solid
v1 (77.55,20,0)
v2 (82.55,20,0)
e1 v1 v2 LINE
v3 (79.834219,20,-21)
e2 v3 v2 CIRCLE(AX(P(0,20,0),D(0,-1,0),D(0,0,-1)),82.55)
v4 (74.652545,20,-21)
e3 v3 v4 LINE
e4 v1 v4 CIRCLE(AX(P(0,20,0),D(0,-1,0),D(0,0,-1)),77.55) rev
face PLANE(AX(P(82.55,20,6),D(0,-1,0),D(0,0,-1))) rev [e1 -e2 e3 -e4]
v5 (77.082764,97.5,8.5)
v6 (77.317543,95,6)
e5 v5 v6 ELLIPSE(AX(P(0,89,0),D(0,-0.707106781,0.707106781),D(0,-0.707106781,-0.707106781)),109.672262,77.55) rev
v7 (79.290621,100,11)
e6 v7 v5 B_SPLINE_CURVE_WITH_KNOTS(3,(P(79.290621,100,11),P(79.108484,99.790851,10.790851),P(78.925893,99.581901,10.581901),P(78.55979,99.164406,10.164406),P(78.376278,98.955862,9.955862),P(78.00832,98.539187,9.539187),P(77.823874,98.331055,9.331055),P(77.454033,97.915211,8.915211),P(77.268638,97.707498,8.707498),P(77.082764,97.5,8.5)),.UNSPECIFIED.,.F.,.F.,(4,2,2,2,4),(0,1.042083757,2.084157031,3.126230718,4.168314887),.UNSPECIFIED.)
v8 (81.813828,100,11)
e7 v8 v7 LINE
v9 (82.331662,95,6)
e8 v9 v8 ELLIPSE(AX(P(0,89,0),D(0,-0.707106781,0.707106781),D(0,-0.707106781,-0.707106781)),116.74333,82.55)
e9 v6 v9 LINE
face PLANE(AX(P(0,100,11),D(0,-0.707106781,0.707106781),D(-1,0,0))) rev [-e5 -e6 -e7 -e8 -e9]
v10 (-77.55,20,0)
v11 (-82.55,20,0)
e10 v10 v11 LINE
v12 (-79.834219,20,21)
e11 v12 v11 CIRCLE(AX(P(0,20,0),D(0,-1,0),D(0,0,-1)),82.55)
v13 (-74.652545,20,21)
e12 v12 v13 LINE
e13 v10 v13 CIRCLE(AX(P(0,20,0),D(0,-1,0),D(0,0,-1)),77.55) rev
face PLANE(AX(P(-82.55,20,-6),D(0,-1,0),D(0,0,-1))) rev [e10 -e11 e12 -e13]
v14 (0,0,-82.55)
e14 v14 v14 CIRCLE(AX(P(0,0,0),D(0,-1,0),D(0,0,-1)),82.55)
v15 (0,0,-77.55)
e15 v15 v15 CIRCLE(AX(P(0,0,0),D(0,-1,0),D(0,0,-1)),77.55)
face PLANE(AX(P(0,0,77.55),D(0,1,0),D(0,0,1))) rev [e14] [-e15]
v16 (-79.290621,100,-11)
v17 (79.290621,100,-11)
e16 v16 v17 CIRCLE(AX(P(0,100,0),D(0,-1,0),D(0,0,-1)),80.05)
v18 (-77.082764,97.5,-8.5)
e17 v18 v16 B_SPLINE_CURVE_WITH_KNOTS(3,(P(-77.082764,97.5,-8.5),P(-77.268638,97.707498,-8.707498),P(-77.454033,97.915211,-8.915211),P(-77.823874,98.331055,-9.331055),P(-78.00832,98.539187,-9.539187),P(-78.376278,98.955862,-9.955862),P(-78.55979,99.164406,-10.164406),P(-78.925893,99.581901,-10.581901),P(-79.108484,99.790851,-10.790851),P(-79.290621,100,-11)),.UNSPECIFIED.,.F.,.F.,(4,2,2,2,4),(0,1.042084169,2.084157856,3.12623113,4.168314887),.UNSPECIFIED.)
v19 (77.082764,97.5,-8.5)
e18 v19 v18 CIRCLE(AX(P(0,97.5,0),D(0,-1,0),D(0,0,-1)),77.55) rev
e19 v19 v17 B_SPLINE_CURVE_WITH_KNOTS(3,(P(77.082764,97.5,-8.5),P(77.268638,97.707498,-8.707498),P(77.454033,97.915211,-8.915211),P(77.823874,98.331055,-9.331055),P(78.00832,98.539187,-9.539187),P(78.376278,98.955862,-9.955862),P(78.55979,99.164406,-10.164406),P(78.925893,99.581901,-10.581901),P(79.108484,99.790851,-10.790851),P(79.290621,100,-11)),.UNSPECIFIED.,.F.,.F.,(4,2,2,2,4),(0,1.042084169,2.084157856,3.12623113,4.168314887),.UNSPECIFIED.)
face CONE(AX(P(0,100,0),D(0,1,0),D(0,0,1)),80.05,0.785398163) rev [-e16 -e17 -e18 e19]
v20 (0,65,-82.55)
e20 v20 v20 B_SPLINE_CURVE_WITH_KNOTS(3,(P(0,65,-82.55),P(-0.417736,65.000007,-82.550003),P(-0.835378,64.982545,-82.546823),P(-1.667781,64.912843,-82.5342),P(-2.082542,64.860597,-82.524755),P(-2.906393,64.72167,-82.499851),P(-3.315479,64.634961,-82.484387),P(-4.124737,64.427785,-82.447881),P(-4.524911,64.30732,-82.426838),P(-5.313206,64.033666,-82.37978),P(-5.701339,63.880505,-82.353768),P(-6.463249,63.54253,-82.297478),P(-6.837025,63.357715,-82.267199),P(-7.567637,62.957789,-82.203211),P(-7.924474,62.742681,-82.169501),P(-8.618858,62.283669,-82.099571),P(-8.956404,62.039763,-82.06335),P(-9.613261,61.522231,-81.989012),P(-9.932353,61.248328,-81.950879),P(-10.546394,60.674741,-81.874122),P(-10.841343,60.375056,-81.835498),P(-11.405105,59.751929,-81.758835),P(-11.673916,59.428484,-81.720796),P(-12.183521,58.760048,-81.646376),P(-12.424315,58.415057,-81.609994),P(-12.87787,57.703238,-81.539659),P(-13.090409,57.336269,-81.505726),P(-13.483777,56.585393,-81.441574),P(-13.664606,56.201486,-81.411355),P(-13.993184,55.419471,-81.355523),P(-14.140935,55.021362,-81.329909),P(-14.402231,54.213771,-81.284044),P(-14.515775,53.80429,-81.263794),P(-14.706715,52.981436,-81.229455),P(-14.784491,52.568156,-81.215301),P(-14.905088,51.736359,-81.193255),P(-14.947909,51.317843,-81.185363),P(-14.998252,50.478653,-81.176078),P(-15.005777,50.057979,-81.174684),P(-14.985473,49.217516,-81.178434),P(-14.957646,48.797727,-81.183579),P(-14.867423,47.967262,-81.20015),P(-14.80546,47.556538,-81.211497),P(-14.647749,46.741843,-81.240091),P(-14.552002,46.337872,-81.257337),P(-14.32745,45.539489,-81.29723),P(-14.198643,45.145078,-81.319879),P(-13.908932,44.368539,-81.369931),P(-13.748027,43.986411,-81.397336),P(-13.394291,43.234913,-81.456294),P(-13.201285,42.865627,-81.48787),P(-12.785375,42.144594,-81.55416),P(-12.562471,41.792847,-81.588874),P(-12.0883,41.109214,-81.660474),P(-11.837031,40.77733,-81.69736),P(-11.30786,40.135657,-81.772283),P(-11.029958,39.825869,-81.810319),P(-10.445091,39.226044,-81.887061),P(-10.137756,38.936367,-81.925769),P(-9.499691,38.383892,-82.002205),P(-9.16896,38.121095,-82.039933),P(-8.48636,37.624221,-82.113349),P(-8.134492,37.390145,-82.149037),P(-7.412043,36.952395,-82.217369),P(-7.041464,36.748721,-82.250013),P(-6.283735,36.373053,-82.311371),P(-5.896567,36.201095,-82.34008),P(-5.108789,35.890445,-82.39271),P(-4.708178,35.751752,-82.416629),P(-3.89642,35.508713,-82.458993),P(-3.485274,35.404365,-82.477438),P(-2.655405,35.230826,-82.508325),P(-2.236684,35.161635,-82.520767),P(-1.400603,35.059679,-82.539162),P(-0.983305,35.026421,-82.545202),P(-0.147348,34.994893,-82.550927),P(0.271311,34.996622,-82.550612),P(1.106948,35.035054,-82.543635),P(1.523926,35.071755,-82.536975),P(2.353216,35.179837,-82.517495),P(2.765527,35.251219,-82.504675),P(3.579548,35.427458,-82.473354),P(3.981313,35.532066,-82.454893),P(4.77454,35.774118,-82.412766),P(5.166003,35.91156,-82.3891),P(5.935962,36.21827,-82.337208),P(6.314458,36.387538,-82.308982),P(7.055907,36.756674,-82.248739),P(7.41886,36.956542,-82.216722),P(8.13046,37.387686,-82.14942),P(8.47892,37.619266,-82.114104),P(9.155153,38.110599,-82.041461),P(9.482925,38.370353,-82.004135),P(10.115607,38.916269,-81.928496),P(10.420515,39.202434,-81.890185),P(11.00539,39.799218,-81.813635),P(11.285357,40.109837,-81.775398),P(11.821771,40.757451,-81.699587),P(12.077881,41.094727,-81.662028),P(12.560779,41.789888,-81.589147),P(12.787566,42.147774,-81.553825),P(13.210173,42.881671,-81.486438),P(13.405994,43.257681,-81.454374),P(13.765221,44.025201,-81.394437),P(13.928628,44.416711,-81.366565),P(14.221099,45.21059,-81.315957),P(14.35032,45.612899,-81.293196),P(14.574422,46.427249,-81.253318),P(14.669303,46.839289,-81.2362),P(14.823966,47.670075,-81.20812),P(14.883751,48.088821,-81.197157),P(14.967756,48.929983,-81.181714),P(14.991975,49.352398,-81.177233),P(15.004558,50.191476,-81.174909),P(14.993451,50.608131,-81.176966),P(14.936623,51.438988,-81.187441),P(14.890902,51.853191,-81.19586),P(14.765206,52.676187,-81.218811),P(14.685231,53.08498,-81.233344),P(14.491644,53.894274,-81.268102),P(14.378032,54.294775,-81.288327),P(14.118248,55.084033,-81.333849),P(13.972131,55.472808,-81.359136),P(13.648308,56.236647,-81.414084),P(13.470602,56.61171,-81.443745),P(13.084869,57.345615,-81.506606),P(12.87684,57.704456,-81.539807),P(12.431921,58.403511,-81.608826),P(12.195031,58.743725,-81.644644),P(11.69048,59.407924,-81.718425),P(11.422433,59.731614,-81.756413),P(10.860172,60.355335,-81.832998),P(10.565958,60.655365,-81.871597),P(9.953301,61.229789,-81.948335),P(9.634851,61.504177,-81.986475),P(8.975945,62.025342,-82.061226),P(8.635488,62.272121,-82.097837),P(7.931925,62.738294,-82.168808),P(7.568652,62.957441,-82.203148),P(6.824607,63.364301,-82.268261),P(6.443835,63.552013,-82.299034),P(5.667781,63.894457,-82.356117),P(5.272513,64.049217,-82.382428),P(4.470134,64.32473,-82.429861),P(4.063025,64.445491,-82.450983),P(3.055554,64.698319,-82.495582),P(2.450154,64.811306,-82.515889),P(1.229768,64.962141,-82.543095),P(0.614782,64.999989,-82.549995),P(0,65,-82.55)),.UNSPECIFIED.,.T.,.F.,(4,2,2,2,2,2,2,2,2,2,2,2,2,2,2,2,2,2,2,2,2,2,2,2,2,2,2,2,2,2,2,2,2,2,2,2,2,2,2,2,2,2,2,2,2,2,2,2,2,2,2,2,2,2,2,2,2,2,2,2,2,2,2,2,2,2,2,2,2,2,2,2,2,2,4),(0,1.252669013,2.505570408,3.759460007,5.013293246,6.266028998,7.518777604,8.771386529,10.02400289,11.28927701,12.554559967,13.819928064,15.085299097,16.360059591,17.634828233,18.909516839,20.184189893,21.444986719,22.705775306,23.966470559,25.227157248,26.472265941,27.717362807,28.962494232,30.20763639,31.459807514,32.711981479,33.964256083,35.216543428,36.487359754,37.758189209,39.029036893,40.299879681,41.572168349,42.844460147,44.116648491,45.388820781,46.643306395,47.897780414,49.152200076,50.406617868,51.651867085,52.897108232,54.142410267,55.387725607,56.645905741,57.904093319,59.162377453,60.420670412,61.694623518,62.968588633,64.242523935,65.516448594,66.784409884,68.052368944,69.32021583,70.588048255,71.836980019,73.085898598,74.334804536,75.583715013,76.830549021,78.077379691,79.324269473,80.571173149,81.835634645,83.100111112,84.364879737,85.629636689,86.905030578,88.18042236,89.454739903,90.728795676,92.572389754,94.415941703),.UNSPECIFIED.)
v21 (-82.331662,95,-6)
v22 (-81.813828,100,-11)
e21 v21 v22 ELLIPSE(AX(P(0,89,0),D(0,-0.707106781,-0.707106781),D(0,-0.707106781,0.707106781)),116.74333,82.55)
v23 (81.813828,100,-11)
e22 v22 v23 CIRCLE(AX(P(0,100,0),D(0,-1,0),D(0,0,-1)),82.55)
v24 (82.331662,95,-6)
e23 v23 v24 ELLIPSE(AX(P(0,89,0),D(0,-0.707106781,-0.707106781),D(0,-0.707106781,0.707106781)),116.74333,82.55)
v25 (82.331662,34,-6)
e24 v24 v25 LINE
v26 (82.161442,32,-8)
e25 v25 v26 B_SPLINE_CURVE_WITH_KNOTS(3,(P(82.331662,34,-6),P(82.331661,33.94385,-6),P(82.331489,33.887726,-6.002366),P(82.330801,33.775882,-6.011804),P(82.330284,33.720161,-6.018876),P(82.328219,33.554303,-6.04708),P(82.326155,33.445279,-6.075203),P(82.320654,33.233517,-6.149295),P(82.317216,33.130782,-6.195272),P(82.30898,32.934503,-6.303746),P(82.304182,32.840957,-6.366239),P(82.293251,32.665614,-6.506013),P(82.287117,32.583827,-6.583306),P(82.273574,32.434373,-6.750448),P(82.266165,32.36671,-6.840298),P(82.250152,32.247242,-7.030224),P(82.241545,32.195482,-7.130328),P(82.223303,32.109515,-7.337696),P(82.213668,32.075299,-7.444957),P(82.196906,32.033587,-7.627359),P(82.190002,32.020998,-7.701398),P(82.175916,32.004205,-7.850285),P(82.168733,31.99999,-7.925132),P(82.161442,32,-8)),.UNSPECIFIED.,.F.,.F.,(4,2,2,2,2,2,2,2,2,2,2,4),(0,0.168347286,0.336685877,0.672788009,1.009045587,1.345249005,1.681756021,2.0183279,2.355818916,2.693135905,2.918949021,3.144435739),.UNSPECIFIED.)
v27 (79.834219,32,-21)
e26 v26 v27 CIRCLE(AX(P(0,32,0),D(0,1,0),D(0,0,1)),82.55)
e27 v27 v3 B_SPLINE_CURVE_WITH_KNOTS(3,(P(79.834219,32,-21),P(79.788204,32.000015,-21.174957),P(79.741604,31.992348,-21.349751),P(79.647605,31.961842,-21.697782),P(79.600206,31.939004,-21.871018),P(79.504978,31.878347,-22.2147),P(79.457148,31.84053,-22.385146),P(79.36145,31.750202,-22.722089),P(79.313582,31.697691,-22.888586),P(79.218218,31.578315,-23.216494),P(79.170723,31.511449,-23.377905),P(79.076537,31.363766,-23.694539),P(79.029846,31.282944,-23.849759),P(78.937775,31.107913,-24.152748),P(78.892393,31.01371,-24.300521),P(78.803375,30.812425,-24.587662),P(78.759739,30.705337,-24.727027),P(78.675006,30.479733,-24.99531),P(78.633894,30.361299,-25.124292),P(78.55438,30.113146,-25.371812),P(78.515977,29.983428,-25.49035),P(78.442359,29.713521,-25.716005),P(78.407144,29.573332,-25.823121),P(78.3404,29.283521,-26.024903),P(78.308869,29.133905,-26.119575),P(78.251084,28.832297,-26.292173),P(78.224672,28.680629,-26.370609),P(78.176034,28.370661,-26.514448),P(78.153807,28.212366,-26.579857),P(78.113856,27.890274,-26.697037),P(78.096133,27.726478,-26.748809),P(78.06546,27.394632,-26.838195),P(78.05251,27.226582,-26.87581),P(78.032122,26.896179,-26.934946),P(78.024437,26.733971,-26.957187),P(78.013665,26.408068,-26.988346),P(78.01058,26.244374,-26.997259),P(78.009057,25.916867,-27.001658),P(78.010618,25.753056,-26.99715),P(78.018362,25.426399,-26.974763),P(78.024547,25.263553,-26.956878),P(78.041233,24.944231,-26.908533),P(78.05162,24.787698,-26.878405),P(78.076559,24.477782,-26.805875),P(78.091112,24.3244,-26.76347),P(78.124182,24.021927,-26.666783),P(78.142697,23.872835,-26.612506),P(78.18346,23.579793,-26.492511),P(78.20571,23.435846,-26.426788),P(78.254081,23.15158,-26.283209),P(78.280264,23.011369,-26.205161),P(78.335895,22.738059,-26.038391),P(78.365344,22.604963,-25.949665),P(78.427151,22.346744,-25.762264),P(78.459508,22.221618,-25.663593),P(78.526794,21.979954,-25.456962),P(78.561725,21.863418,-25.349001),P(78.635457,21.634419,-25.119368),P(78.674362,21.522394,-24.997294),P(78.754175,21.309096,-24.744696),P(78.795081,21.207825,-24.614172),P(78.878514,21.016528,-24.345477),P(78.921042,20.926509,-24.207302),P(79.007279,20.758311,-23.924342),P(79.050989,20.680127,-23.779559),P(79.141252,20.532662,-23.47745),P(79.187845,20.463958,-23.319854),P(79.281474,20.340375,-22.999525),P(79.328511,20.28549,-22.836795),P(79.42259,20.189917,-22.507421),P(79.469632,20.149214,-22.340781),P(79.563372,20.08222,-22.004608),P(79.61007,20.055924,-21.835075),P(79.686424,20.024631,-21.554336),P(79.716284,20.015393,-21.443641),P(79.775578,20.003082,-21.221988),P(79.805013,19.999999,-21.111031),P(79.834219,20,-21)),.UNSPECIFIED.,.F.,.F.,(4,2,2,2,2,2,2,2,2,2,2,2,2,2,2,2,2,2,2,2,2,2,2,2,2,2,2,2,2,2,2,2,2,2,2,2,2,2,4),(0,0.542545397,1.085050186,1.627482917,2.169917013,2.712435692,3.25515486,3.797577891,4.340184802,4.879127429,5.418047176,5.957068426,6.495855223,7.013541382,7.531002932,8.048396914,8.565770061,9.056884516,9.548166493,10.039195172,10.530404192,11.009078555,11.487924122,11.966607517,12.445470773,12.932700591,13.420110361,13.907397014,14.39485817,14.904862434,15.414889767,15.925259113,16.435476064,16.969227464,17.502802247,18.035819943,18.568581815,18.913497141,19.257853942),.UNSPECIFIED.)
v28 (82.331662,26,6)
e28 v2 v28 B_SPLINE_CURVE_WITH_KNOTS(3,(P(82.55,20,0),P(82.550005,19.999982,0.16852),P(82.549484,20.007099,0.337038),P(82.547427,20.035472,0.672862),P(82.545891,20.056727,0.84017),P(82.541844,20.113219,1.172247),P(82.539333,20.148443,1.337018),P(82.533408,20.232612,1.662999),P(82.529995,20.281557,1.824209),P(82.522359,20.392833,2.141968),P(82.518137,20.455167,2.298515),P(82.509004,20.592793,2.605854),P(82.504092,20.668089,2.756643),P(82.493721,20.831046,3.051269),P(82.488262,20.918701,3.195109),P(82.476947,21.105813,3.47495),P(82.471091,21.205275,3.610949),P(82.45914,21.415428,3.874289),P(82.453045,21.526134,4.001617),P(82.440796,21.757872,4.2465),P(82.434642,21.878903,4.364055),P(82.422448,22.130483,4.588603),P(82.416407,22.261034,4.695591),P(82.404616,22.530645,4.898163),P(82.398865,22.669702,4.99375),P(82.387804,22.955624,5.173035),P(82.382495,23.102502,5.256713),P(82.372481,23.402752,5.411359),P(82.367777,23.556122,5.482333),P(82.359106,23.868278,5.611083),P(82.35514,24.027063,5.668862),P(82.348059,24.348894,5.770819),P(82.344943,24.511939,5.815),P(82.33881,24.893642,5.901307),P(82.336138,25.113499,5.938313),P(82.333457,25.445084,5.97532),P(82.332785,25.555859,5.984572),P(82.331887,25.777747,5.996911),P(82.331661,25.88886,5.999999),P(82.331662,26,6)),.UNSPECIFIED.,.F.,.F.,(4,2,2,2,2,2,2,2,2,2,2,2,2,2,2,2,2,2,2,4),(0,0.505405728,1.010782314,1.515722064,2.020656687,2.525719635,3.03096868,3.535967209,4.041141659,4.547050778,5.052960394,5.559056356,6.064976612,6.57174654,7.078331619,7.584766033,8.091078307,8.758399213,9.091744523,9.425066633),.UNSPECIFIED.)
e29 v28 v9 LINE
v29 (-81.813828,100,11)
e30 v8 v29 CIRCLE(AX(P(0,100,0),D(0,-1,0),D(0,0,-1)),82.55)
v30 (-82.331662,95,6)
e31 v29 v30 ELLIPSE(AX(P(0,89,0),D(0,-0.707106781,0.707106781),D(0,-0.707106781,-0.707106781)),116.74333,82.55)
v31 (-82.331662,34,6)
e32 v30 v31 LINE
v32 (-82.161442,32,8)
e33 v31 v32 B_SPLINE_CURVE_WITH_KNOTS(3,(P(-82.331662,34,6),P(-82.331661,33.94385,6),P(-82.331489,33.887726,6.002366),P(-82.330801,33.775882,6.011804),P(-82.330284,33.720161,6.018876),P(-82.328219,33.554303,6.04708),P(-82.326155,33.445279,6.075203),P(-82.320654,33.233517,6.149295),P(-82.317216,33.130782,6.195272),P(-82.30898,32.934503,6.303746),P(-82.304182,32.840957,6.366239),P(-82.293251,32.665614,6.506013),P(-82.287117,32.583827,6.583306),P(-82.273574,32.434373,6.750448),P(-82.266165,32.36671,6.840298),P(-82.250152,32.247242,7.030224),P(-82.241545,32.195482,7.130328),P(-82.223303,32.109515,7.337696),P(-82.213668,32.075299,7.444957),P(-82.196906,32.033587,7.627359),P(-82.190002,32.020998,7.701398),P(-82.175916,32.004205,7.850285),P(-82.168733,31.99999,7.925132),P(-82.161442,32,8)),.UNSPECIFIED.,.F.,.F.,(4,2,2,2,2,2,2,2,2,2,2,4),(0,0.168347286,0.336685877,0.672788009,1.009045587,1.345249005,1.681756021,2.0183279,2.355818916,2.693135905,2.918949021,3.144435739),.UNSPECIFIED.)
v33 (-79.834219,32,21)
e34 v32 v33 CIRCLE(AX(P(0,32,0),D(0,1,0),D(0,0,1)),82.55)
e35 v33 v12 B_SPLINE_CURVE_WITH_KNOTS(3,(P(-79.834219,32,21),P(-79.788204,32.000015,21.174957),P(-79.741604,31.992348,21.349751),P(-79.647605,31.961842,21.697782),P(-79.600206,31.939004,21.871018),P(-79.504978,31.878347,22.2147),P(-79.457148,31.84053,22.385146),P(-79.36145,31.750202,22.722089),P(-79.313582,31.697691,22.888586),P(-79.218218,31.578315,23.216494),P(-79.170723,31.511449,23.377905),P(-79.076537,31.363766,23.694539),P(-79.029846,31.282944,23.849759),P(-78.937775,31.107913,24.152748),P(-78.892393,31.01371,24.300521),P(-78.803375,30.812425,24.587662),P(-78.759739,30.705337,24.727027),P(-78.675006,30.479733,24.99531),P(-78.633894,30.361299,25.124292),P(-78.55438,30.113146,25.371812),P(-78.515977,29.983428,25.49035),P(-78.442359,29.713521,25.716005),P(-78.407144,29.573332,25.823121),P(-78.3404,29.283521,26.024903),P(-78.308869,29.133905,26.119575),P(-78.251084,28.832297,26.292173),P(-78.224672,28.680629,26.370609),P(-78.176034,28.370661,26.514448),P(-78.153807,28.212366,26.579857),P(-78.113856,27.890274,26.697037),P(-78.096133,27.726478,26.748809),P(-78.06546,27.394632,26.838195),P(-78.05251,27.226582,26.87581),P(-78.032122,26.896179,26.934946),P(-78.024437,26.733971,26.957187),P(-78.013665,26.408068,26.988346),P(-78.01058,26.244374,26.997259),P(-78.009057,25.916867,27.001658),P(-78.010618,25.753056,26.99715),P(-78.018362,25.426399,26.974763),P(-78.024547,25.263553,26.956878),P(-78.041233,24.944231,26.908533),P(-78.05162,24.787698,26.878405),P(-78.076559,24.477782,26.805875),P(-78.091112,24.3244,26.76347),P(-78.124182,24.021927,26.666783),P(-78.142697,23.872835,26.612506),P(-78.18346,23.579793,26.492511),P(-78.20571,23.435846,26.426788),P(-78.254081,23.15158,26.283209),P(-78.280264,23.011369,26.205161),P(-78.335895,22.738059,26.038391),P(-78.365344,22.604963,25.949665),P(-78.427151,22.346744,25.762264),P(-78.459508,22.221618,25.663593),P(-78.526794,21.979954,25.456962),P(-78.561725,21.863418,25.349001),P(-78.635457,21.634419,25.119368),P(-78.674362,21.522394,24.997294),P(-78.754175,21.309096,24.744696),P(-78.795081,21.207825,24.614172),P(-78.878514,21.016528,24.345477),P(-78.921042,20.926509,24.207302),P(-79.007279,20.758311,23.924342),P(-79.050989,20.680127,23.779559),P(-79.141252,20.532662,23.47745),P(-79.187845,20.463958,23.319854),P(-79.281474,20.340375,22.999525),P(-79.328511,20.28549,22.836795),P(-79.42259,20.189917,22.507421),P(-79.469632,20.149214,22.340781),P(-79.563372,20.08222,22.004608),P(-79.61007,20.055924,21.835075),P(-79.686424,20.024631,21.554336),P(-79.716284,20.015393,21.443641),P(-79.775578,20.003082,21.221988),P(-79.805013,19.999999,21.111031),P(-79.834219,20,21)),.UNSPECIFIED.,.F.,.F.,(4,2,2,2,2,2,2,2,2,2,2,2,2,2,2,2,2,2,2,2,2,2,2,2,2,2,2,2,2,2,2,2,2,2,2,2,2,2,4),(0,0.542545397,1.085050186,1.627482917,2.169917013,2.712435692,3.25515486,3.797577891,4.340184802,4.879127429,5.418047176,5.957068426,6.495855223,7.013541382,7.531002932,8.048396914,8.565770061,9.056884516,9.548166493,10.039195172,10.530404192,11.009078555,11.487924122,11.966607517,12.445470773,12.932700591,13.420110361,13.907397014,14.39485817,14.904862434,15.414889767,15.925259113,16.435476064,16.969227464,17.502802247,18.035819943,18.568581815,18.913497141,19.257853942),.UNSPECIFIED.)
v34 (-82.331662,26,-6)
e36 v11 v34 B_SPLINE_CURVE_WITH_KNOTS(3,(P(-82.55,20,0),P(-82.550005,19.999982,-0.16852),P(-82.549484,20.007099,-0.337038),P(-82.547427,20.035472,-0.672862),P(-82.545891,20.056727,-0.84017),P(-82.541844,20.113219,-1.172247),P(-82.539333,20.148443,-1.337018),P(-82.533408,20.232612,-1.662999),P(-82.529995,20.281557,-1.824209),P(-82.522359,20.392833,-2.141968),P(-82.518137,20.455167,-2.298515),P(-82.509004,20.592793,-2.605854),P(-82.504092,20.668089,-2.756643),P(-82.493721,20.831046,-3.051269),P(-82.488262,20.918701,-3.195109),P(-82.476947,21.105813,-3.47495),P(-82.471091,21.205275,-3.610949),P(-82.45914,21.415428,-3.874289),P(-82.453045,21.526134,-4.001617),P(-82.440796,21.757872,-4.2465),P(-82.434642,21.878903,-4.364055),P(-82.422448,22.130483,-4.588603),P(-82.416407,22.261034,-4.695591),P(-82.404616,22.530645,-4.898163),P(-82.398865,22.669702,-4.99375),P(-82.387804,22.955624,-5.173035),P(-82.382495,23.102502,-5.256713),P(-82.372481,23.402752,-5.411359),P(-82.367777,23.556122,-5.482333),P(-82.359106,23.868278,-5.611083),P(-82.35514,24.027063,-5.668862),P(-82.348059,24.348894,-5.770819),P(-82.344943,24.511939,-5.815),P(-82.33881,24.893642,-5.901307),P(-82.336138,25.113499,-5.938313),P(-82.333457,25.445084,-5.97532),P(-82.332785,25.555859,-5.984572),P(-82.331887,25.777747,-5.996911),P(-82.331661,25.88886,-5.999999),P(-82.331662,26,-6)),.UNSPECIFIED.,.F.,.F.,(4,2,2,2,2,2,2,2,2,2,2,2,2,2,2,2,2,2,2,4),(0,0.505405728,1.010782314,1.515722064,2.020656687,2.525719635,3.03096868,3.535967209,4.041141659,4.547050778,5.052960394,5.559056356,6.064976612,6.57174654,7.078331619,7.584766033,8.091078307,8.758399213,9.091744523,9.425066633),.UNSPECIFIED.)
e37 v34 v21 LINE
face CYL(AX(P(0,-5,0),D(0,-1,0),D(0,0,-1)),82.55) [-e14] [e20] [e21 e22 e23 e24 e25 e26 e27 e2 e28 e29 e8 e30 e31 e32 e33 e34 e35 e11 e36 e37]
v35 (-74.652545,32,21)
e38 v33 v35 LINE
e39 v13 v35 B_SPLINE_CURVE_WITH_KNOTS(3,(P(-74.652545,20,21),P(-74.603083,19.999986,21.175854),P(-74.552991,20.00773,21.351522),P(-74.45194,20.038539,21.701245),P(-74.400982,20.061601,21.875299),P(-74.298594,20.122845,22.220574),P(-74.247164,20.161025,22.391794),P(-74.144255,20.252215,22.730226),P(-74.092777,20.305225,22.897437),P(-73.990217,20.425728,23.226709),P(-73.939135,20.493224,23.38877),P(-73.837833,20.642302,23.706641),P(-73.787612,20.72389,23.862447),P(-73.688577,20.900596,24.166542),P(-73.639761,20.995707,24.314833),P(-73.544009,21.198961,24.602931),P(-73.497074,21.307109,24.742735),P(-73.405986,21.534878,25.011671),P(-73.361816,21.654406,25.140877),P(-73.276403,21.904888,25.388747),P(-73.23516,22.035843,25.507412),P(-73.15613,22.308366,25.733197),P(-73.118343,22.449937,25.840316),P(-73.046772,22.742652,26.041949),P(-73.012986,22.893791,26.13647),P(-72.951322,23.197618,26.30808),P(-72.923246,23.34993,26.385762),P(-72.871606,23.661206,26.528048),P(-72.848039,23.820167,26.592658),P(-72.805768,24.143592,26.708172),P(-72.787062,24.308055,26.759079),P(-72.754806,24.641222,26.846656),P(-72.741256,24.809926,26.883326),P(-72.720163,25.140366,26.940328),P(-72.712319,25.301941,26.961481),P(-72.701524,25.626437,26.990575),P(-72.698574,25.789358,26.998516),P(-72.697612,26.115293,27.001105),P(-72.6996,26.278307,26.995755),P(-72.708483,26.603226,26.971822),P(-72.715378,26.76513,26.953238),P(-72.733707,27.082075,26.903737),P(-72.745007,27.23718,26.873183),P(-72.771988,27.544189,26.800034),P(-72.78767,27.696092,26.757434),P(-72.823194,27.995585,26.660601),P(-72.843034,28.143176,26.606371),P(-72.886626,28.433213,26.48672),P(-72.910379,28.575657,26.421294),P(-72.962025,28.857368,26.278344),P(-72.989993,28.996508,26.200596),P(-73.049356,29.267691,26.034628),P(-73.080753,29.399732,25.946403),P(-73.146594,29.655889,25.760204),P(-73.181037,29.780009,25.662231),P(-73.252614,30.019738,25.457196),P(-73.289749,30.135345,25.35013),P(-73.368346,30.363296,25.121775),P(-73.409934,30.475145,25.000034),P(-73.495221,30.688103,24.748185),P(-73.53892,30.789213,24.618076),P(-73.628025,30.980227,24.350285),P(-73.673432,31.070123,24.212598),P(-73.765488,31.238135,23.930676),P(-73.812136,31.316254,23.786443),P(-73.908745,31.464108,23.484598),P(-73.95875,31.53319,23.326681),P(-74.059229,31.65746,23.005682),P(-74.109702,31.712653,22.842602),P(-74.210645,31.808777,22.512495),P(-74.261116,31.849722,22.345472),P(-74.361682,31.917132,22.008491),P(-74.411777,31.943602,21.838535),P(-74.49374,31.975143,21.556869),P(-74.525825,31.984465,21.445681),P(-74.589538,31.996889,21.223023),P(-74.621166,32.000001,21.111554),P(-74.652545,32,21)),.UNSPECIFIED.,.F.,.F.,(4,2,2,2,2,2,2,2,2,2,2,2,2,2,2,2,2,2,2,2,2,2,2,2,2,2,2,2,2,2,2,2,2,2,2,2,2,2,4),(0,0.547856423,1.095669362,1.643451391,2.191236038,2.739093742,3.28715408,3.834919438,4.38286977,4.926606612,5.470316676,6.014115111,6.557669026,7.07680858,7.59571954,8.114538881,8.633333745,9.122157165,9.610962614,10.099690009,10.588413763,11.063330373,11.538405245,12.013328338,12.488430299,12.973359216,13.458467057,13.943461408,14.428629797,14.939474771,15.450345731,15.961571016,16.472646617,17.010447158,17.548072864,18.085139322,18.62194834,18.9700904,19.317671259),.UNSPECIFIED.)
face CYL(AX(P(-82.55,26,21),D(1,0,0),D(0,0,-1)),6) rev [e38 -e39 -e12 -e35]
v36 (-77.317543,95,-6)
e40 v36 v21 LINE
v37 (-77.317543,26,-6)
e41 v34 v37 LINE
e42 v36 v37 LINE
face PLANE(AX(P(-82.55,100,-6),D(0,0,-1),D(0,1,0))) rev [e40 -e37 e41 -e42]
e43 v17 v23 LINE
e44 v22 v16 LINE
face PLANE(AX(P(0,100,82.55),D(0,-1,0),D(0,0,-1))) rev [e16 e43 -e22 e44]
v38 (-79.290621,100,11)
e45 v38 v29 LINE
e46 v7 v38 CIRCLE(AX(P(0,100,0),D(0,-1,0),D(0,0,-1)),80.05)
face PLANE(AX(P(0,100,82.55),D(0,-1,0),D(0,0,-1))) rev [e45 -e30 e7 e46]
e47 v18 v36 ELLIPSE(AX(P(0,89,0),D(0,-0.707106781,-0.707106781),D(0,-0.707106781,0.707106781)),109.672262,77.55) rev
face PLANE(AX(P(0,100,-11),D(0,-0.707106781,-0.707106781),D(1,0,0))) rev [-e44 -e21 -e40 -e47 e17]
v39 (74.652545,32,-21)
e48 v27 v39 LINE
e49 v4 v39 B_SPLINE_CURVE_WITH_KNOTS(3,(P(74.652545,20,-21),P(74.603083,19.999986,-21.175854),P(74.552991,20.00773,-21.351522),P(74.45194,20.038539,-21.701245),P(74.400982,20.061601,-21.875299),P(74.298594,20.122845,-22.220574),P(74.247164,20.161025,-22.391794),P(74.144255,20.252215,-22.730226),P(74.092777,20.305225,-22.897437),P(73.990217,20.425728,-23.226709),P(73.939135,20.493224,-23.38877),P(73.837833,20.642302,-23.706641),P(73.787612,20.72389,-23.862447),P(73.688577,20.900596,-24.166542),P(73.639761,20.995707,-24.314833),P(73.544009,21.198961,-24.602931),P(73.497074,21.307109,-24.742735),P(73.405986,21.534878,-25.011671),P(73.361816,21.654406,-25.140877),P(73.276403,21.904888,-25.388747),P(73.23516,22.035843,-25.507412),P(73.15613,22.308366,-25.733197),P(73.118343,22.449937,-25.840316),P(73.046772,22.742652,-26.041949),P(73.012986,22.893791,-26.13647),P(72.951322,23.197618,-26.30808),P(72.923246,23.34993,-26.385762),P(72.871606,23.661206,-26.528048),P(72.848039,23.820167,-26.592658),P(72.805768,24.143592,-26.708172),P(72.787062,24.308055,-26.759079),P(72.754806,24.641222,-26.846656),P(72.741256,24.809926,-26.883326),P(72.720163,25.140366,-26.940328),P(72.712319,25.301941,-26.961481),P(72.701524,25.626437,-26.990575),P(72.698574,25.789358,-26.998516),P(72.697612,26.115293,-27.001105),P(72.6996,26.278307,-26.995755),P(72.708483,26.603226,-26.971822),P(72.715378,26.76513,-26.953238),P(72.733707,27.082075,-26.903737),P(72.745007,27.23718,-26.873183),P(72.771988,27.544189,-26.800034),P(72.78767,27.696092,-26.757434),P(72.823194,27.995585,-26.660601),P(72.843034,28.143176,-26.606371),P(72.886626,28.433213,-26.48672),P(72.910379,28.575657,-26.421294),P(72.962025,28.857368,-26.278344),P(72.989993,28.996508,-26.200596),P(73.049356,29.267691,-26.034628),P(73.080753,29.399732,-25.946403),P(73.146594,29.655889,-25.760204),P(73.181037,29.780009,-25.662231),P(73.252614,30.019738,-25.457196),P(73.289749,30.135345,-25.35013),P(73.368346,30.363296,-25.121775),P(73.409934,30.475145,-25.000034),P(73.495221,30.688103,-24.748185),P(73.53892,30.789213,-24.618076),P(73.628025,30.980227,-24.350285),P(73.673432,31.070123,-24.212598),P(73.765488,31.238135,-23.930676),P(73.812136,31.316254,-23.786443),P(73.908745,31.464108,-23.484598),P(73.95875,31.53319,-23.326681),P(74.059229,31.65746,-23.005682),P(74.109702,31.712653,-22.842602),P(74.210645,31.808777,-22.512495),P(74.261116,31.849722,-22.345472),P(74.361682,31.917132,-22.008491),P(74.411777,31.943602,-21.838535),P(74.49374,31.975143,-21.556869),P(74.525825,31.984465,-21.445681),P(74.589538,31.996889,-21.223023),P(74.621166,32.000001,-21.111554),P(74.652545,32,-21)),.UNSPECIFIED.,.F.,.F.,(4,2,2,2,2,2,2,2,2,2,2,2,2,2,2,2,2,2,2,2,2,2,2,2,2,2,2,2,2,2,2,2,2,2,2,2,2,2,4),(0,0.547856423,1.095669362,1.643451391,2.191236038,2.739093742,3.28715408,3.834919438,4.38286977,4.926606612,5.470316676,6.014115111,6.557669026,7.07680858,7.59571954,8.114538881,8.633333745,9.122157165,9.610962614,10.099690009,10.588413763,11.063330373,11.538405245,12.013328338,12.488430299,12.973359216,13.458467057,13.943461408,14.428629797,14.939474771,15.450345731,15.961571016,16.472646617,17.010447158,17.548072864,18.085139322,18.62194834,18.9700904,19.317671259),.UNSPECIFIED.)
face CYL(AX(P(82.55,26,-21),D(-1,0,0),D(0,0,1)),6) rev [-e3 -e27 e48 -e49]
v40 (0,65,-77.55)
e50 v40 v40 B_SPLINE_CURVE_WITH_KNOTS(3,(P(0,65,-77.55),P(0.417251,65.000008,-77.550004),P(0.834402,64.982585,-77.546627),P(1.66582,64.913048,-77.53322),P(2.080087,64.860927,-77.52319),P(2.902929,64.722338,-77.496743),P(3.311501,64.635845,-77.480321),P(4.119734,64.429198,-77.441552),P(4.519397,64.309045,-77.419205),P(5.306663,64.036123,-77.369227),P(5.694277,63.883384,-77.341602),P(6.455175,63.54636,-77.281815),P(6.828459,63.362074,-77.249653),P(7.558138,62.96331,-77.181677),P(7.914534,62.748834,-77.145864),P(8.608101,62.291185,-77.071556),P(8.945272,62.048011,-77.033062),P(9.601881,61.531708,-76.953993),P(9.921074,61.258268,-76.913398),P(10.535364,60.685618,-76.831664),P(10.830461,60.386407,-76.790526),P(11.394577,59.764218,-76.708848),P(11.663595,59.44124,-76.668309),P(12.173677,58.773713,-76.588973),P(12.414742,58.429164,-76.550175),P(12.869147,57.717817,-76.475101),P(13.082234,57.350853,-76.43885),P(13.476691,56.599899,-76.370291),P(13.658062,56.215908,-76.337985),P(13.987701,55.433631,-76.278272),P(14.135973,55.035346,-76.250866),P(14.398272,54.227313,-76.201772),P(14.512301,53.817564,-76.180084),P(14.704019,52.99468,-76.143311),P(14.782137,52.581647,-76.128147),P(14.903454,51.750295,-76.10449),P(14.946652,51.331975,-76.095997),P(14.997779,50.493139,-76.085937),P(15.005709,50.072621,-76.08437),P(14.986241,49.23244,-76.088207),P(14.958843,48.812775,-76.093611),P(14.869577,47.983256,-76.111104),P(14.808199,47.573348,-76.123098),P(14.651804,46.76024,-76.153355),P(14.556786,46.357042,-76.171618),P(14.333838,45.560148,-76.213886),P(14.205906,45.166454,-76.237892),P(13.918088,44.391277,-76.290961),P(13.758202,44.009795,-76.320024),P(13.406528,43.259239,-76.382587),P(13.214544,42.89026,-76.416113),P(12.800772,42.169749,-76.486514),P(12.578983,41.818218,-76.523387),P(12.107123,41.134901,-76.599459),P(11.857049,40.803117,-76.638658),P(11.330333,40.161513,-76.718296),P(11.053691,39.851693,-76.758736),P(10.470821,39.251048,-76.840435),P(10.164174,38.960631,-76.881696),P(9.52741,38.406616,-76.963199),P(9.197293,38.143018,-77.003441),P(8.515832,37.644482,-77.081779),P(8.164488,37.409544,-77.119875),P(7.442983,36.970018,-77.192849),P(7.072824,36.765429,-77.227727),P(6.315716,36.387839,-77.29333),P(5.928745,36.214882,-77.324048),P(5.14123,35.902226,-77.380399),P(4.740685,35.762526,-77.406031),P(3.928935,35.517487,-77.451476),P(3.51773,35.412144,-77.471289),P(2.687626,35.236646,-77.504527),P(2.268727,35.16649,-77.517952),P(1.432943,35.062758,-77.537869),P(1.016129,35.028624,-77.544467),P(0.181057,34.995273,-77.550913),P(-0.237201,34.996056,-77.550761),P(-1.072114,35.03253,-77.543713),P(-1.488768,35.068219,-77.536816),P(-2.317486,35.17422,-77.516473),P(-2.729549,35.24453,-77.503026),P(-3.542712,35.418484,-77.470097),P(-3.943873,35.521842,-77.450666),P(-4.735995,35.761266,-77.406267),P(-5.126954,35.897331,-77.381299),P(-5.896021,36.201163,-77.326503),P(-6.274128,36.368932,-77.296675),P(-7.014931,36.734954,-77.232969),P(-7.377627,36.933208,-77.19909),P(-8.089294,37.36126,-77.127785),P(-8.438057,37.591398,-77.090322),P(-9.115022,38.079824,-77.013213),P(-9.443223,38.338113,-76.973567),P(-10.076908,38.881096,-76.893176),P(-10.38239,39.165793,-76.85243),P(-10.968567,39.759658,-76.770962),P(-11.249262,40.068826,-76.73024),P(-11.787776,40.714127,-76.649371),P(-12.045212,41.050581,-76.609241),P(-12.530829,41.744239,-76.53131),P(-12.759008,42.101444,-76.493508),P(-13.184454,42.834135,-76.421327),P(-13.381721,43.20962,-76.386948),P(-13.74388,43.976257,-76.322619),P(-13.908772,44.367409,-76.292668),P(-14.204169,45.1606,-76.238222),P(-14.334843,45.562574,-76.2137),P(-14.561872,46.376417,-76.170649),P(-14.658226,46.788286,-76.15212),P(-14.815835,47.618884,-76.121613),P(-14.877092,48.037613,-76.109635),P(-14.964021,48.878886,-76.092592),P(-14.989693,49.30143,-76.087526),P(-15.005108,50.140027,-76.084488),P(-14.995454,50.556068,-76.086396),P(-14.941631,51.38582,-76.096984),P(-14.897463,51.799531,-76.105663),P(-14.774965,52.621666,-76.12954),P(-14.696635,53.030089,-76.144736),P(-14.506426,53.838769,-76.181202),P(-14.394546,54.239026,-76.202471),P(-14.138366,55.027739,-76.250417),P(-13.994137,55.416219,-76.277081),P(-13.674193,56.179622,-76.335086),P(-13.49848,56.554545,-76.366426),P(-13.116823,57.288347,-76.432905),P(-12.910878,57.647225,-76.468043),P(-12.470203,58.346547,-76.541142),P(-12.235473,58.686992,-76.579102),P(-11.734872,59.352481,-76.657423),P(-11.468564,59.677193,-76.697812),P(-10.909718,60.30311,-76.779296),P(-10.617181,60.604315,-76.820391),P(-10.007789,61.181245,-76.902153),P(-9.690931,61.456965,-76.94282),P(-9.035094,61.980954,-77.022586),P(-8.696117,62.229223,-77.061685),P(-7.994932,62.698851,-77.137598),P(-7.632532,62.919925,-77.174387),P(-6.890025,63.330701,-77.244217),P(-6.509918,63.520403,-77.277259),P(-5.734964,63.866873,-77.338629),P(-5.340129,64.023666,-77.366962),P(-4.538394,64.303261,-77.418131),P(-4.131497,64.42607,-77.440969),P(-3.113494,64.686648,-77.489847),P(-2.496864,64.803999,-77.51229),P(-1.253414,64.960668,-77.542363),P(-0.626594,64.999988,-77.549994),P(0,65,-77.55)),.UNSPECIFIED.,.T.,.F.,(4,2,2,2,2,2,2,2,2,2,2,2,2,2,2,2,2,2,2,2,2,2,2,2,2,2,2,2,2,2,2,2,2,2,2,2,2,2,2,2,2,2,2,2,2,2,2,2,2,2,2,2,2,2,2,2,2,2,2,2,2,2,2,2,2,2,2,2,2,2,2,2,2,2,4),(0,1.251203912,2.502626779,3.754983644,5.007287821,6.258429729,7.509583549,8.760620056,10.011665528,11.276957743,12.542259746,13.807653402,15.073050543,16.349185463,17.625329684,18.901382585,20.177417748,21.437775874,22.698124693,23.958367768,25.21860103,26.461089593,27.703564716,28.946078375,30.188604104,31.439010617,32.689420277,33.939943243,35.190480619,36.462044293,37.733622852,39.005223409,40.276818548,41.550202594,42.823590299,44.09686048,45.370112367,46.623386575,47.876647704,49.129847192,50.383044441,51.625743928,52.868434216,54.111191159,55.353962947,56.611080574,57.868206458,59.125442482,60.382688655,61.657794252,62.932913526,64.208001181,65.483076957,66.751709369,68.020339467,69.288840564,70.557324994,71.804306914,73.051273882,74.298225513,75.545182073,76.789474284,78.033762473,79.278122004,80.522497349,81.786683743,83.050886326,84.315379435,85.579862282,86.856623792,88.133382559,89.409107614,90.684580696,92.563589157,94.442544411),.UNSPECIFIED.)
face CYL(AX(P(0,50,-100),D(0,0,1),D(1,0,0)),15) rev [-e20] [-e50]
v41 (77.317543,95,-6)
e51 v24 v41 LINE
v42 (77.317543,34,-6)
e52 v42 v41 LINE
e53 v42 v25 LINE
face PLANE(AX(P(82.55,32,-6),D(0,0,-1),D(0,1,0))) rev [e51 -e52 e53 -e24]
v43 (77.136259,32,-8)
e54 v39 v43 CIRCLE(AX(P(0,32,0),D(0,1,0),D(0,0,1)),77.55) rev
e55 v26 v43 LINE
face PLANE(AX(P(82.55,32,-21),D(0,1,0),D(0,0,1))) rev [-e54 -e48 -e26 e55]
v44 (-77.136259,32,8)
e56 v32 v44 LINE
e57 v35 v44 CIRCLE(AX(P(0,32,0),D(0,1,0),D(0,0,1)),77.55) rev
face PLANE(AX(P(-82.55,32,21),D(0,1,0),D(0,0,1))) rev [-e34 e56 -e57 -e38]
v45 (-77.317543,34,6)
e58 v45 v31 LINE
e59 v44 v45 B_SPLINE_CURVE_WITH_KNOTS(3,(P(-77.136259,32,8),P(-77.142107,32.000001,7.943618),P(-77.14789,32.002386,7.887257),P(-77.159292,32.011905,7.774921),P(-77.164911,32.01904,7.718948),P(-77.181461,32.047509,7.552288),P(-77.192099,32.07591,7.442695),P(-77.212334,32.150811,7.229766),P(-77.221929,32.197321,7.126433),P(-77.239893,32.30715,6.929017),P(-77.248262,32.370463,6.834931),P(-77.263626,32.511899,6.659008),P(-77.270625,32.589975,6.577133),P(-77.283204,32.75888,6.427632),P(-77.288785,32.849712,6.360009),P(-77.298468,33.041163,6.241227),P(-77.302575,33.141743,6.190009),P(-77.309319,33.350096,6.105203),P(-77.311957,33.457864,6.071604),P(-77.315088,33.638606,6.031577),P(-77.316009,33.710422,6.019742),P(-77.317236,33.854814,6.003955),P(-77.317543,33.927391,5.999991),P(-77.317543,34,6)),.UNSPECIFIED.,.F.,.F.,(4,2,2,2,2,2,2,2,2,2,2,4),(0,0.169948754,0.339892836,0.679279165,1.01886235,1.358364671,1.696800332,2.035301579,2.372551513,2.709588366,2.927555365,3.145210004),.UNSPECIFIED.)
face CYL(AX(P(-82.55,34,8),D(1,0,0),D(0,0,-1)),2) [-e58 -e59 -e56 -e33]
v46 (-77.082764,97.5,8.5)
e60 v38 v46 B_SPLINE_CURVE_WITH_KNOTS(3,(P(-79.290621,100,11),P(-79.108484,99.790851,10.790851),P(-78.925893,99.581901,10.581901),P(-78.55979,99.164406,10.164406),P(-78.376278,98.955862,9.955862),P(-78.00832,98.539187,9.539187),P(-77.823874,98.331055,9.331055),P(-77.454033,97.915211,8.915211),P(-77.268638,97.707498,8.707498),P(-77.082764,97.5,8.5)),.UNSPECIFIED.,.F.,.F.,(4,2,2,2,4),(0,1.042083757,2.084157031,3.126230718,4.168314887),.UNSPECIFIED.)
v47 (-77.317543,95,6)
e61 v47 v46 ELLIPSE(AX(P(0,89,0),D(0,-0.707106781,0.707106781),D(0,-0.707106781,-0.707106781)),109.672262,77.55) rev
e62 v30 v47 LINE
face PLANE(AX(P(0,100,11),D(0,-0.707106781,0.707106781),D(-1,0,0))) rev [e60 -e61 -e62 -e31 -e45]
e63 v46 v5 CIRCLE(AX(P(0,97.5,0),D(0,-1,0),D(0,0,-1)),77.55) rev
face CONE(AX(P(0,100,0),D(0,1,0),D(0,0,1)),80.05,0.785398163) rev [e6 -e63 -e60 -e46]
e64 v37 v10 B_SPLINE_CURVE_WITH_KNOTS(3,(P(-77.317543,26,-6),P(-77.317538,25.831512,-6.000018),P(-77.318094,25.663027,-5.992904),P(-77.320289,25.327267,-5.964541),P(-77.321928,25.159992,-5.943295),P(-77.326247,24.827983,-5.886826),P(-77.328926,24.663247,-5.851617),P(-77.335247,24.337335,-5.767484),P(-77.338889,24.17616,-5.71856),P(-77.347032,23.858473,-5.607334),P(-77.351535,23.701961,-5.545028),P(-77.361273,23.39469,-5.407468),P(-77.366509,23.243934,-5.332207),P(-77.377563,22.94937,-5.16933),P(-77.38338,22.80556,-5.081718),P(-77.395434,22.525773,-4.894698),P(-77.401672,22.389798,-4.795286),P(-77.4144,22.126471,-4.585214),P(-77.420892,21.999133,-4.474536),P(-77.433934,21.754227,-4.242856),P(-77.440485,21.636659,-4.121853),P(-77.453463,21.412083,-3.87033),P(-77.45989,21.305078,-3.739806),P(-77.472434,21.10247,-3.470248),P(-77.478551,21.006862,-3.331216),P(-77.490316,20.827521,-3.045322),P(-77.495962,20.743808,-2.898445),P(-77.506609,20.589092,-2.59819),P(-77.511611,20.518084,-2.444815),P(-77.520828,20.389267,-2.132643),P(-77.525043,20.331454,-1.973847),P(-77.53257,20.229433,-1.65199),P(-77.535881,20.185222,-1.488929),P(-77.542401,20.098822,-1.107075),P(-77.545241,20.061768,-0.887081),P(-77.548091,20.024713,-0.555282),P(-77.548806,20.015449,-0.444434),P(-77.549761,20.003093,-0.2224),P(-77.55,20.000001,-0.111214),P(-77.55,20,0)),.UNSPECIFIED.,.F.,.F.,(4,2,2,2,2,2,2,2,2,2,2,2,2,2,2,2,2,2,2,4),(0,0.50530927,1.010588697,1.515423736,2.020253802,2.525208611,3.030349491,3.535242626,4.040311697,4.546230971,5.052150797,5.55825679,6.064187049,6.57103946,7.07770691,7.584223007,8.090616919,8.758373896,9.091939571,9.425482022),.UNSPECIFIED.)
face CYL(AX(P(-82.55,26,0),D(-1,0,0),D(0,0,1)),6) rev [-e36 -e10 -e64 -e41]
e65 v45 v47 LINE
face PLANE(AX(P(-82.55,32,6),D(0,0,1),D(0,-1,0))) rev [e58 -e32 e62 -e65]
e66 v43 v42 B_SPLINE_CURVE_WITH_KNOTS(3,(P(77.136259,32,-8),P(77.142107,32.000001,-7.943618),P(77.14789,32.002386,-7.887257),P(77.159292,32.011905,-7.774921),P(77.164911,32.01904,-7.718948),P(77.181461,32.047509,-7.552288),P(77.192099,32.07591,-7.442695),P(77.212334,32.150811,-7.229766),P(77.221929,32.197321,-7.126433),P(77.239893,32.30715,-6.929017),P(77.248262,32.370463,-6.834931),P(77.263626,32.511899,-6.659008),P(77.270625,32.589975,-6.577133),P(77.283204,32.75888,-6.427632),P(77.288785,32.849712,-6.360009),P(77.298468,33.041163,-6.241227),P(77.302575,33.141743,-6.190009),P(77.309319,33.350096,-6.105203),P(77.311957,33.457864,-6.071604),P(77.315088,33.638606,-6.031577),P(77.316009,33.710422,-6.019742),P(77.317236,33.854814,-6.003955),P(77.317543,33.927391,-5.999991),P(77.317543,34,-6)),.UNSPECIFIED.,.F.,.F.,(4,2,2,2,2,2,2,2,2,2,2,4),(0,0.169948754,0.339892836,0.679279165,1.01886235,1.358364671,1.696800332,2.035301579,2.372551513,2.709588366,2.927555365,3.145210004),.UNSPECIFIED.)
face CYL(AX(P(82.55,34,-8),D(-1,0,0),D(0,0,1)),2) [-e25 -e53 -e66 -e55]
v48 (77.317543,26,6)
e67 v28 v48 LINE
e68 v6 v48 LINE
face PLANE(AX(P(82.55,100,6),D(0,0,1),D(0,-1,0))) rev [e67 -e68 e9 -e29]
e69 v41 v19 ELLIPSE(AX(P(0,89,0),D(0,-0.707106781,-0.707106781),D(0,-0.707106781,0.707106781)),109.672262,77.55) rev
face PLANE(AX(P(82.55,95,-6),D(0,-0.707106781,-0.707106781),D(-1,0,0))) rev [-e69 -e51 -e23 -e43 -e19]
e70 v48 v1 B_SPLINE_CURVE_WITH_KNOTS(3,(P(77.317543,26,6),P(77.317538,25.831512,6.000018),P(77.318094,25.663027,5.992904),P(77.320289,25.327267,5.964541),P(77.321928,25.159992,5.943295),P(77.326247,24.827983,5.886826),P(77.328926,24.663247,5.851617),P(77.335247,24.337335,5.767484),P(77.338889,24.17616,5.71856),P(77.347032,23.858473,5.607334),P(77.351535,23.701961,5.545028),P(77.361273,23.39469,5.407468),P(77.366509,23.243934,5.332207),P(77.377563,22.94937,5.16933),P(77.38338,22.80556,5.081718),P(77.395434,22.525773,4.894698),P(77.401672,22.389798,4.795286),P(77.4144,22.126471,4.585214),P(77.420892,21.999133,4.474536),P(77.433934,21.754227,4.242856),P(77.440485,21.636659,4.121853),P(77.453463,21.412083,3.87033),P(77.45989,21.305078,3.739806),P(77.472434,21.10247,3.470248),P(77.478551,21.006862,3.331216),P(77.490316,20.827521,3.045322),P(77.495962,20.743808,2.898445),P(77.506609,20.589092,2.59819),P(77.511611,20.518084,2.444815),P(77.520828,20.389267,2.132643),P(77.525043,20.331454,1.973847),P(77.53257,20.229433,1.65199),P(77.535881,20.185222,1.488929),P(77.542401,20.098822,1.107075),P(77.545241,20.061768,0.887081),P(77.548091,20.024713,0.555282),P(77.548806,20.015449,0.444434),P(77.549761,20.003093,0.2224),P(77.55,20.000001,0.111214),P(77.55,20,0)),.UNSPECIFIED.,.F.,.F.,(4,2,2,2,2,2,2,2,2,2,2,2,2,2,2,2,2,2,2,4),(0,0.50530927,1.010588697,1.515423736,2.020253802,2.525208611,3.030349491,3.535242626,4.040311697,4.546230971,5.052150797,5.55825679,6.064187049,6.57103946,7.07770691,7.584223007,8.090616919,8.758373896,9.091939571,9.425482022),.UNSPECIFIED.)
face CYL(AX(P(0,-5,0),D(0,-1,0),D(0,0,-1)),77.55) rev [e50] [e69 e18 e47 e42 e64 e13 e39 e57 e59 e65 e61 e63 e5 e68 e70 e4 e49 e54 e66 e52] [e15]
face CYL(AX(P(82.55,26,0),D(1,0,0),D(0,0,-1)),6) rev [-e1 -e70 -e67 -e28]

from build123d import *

# Parameters (mm, degrees)
SKETCH2_W          = 5
SKETCH2_H          = 100
CUT_EXTRUDE1_DEPTH = 154.717289203
FILLET1_R          = 6
CHAMFER1_SIZE      = 5
CHAMFER2_SIZE      = 2.5
FILLET4_R          = 2
CIRPATTERN1_START  = 72.698022634
CIRPATTERN1_DEPTH  = 9.851977366
SKETCH4_R          = 15
CUT_EXTRUDE2_DEPTH = 100


# Read off the part's stored shape, not the designer's step: CirPattern1
with BuildPart() as part:
    # Sketch2 → Revolve1 (revolve)
    with BuildSketch(Plane(origin=(0, 0, 0), x_dir=(0, 0, -1), z_dir=(1, 0, 0)), mode=Mode.PRIVATE) as revolve1_sk:
        with Locations((-80.05, 50)):
            Rectangle(SKETCH2_W, SKETCH2_H)
    revolve(revolve1_sk.sketch.rotate(Axis((0, -5, 0), (0, 1, 0)), 180), axis=Axis((0, -5, 0), (0, 1, 0)))

    # Sketch3 → Cut-Extrude1 (cut, through all)
    with BuildSketch(Plane(origin=(0, 0, 0), x_dir=(0, 0, -1), z_dir=(1, 0, 0))):
        with BuildLine():
            Line((-6, 100), (6, 100))
            Line((6, 100), (6, 20))
            Line((6, 20), (-21, 20))
            ThreePointArc((-21, 20), (-27, 26), (-21, 32))
            Line((-21, 32), (-6, 32))
            Line((-6, 32), (-6, 100))
        make_face()
    extrude(amount=-CUT_EXTRUDE1_DEPTH, mode=Mode.SUBTRACT)

    # Fillet1
    fillet1_edges = [part.edges().sort_by_distance(p)[0] for p in [
        (-79.824602438, 20, -6),
    ]]
    fillet(fillet1_edges, radius=FILLET1_R)

    # Chamfer1
    chamfer1_edges = [part.edges().sort_by_distance(p)[0] for p in [
        (-79.824602438, 100, -6),
        (-79.824602438, 100, 6),
    ]]
    chamfer(chamfer1_edges, length=CHAMFER1_SIZE)

    # Chamfer2
    chamfer2_edges = [part.edges().sort_by_distance(p)[0] for p in [
        (58.596298945, 100, 50.798388262),
    ]]
    chamfer(chamfer2_edges, length=CHAMFER2_SIZE)

    # Fillet4
    fillet4_edges = [part.edges().sort_by_distance(p)[0] for p in [
        (-79.824602438, 32, 6),
    ]]
    fillet(fillet4_edges, radius=FILLET4_R)

    # CirPattern1 outline → CirPattern1 (cut)
    with BuildSketch(Plane.YZ.offset(CIRPATTERN1_START)):
        with BuildLine():
            ThreePointArc((26, 6), (21.757359313, 4.242640687), (20, 0))
            Line((20, 0), (20, -21))
            ThreePointArc((20, -21), (26, -27), (32, -21))
            Line((32, -21), (32, -8))
            ThreePointArc((32, -8), (32.585786438, -6.585786438), (34, -6))
            Line((34, -6), (95, -6))
            Line((95, -6), (100, -11))
            Line((100, -11), (100, 11))
            Line((100, 11), (95, 6))
            Line((95, 6), (26, 6))
        make_face()
    extrude(amount=CIRPATTERN1_DEPTH, mode=Mode.SUBTRACT)

    # Sketch4 → Cut-Extrude2 (cut)
    with BuildSketch(Plane.XY):
        with Locations(Location((0, 50, 0), (0, 0, 90))):
            Circle(SKETCH4_R)
    extrude(amount=-CUT_EXTRUDE2_DEPTH, mode=Mode.SUBTRACT)


solid = part.part
